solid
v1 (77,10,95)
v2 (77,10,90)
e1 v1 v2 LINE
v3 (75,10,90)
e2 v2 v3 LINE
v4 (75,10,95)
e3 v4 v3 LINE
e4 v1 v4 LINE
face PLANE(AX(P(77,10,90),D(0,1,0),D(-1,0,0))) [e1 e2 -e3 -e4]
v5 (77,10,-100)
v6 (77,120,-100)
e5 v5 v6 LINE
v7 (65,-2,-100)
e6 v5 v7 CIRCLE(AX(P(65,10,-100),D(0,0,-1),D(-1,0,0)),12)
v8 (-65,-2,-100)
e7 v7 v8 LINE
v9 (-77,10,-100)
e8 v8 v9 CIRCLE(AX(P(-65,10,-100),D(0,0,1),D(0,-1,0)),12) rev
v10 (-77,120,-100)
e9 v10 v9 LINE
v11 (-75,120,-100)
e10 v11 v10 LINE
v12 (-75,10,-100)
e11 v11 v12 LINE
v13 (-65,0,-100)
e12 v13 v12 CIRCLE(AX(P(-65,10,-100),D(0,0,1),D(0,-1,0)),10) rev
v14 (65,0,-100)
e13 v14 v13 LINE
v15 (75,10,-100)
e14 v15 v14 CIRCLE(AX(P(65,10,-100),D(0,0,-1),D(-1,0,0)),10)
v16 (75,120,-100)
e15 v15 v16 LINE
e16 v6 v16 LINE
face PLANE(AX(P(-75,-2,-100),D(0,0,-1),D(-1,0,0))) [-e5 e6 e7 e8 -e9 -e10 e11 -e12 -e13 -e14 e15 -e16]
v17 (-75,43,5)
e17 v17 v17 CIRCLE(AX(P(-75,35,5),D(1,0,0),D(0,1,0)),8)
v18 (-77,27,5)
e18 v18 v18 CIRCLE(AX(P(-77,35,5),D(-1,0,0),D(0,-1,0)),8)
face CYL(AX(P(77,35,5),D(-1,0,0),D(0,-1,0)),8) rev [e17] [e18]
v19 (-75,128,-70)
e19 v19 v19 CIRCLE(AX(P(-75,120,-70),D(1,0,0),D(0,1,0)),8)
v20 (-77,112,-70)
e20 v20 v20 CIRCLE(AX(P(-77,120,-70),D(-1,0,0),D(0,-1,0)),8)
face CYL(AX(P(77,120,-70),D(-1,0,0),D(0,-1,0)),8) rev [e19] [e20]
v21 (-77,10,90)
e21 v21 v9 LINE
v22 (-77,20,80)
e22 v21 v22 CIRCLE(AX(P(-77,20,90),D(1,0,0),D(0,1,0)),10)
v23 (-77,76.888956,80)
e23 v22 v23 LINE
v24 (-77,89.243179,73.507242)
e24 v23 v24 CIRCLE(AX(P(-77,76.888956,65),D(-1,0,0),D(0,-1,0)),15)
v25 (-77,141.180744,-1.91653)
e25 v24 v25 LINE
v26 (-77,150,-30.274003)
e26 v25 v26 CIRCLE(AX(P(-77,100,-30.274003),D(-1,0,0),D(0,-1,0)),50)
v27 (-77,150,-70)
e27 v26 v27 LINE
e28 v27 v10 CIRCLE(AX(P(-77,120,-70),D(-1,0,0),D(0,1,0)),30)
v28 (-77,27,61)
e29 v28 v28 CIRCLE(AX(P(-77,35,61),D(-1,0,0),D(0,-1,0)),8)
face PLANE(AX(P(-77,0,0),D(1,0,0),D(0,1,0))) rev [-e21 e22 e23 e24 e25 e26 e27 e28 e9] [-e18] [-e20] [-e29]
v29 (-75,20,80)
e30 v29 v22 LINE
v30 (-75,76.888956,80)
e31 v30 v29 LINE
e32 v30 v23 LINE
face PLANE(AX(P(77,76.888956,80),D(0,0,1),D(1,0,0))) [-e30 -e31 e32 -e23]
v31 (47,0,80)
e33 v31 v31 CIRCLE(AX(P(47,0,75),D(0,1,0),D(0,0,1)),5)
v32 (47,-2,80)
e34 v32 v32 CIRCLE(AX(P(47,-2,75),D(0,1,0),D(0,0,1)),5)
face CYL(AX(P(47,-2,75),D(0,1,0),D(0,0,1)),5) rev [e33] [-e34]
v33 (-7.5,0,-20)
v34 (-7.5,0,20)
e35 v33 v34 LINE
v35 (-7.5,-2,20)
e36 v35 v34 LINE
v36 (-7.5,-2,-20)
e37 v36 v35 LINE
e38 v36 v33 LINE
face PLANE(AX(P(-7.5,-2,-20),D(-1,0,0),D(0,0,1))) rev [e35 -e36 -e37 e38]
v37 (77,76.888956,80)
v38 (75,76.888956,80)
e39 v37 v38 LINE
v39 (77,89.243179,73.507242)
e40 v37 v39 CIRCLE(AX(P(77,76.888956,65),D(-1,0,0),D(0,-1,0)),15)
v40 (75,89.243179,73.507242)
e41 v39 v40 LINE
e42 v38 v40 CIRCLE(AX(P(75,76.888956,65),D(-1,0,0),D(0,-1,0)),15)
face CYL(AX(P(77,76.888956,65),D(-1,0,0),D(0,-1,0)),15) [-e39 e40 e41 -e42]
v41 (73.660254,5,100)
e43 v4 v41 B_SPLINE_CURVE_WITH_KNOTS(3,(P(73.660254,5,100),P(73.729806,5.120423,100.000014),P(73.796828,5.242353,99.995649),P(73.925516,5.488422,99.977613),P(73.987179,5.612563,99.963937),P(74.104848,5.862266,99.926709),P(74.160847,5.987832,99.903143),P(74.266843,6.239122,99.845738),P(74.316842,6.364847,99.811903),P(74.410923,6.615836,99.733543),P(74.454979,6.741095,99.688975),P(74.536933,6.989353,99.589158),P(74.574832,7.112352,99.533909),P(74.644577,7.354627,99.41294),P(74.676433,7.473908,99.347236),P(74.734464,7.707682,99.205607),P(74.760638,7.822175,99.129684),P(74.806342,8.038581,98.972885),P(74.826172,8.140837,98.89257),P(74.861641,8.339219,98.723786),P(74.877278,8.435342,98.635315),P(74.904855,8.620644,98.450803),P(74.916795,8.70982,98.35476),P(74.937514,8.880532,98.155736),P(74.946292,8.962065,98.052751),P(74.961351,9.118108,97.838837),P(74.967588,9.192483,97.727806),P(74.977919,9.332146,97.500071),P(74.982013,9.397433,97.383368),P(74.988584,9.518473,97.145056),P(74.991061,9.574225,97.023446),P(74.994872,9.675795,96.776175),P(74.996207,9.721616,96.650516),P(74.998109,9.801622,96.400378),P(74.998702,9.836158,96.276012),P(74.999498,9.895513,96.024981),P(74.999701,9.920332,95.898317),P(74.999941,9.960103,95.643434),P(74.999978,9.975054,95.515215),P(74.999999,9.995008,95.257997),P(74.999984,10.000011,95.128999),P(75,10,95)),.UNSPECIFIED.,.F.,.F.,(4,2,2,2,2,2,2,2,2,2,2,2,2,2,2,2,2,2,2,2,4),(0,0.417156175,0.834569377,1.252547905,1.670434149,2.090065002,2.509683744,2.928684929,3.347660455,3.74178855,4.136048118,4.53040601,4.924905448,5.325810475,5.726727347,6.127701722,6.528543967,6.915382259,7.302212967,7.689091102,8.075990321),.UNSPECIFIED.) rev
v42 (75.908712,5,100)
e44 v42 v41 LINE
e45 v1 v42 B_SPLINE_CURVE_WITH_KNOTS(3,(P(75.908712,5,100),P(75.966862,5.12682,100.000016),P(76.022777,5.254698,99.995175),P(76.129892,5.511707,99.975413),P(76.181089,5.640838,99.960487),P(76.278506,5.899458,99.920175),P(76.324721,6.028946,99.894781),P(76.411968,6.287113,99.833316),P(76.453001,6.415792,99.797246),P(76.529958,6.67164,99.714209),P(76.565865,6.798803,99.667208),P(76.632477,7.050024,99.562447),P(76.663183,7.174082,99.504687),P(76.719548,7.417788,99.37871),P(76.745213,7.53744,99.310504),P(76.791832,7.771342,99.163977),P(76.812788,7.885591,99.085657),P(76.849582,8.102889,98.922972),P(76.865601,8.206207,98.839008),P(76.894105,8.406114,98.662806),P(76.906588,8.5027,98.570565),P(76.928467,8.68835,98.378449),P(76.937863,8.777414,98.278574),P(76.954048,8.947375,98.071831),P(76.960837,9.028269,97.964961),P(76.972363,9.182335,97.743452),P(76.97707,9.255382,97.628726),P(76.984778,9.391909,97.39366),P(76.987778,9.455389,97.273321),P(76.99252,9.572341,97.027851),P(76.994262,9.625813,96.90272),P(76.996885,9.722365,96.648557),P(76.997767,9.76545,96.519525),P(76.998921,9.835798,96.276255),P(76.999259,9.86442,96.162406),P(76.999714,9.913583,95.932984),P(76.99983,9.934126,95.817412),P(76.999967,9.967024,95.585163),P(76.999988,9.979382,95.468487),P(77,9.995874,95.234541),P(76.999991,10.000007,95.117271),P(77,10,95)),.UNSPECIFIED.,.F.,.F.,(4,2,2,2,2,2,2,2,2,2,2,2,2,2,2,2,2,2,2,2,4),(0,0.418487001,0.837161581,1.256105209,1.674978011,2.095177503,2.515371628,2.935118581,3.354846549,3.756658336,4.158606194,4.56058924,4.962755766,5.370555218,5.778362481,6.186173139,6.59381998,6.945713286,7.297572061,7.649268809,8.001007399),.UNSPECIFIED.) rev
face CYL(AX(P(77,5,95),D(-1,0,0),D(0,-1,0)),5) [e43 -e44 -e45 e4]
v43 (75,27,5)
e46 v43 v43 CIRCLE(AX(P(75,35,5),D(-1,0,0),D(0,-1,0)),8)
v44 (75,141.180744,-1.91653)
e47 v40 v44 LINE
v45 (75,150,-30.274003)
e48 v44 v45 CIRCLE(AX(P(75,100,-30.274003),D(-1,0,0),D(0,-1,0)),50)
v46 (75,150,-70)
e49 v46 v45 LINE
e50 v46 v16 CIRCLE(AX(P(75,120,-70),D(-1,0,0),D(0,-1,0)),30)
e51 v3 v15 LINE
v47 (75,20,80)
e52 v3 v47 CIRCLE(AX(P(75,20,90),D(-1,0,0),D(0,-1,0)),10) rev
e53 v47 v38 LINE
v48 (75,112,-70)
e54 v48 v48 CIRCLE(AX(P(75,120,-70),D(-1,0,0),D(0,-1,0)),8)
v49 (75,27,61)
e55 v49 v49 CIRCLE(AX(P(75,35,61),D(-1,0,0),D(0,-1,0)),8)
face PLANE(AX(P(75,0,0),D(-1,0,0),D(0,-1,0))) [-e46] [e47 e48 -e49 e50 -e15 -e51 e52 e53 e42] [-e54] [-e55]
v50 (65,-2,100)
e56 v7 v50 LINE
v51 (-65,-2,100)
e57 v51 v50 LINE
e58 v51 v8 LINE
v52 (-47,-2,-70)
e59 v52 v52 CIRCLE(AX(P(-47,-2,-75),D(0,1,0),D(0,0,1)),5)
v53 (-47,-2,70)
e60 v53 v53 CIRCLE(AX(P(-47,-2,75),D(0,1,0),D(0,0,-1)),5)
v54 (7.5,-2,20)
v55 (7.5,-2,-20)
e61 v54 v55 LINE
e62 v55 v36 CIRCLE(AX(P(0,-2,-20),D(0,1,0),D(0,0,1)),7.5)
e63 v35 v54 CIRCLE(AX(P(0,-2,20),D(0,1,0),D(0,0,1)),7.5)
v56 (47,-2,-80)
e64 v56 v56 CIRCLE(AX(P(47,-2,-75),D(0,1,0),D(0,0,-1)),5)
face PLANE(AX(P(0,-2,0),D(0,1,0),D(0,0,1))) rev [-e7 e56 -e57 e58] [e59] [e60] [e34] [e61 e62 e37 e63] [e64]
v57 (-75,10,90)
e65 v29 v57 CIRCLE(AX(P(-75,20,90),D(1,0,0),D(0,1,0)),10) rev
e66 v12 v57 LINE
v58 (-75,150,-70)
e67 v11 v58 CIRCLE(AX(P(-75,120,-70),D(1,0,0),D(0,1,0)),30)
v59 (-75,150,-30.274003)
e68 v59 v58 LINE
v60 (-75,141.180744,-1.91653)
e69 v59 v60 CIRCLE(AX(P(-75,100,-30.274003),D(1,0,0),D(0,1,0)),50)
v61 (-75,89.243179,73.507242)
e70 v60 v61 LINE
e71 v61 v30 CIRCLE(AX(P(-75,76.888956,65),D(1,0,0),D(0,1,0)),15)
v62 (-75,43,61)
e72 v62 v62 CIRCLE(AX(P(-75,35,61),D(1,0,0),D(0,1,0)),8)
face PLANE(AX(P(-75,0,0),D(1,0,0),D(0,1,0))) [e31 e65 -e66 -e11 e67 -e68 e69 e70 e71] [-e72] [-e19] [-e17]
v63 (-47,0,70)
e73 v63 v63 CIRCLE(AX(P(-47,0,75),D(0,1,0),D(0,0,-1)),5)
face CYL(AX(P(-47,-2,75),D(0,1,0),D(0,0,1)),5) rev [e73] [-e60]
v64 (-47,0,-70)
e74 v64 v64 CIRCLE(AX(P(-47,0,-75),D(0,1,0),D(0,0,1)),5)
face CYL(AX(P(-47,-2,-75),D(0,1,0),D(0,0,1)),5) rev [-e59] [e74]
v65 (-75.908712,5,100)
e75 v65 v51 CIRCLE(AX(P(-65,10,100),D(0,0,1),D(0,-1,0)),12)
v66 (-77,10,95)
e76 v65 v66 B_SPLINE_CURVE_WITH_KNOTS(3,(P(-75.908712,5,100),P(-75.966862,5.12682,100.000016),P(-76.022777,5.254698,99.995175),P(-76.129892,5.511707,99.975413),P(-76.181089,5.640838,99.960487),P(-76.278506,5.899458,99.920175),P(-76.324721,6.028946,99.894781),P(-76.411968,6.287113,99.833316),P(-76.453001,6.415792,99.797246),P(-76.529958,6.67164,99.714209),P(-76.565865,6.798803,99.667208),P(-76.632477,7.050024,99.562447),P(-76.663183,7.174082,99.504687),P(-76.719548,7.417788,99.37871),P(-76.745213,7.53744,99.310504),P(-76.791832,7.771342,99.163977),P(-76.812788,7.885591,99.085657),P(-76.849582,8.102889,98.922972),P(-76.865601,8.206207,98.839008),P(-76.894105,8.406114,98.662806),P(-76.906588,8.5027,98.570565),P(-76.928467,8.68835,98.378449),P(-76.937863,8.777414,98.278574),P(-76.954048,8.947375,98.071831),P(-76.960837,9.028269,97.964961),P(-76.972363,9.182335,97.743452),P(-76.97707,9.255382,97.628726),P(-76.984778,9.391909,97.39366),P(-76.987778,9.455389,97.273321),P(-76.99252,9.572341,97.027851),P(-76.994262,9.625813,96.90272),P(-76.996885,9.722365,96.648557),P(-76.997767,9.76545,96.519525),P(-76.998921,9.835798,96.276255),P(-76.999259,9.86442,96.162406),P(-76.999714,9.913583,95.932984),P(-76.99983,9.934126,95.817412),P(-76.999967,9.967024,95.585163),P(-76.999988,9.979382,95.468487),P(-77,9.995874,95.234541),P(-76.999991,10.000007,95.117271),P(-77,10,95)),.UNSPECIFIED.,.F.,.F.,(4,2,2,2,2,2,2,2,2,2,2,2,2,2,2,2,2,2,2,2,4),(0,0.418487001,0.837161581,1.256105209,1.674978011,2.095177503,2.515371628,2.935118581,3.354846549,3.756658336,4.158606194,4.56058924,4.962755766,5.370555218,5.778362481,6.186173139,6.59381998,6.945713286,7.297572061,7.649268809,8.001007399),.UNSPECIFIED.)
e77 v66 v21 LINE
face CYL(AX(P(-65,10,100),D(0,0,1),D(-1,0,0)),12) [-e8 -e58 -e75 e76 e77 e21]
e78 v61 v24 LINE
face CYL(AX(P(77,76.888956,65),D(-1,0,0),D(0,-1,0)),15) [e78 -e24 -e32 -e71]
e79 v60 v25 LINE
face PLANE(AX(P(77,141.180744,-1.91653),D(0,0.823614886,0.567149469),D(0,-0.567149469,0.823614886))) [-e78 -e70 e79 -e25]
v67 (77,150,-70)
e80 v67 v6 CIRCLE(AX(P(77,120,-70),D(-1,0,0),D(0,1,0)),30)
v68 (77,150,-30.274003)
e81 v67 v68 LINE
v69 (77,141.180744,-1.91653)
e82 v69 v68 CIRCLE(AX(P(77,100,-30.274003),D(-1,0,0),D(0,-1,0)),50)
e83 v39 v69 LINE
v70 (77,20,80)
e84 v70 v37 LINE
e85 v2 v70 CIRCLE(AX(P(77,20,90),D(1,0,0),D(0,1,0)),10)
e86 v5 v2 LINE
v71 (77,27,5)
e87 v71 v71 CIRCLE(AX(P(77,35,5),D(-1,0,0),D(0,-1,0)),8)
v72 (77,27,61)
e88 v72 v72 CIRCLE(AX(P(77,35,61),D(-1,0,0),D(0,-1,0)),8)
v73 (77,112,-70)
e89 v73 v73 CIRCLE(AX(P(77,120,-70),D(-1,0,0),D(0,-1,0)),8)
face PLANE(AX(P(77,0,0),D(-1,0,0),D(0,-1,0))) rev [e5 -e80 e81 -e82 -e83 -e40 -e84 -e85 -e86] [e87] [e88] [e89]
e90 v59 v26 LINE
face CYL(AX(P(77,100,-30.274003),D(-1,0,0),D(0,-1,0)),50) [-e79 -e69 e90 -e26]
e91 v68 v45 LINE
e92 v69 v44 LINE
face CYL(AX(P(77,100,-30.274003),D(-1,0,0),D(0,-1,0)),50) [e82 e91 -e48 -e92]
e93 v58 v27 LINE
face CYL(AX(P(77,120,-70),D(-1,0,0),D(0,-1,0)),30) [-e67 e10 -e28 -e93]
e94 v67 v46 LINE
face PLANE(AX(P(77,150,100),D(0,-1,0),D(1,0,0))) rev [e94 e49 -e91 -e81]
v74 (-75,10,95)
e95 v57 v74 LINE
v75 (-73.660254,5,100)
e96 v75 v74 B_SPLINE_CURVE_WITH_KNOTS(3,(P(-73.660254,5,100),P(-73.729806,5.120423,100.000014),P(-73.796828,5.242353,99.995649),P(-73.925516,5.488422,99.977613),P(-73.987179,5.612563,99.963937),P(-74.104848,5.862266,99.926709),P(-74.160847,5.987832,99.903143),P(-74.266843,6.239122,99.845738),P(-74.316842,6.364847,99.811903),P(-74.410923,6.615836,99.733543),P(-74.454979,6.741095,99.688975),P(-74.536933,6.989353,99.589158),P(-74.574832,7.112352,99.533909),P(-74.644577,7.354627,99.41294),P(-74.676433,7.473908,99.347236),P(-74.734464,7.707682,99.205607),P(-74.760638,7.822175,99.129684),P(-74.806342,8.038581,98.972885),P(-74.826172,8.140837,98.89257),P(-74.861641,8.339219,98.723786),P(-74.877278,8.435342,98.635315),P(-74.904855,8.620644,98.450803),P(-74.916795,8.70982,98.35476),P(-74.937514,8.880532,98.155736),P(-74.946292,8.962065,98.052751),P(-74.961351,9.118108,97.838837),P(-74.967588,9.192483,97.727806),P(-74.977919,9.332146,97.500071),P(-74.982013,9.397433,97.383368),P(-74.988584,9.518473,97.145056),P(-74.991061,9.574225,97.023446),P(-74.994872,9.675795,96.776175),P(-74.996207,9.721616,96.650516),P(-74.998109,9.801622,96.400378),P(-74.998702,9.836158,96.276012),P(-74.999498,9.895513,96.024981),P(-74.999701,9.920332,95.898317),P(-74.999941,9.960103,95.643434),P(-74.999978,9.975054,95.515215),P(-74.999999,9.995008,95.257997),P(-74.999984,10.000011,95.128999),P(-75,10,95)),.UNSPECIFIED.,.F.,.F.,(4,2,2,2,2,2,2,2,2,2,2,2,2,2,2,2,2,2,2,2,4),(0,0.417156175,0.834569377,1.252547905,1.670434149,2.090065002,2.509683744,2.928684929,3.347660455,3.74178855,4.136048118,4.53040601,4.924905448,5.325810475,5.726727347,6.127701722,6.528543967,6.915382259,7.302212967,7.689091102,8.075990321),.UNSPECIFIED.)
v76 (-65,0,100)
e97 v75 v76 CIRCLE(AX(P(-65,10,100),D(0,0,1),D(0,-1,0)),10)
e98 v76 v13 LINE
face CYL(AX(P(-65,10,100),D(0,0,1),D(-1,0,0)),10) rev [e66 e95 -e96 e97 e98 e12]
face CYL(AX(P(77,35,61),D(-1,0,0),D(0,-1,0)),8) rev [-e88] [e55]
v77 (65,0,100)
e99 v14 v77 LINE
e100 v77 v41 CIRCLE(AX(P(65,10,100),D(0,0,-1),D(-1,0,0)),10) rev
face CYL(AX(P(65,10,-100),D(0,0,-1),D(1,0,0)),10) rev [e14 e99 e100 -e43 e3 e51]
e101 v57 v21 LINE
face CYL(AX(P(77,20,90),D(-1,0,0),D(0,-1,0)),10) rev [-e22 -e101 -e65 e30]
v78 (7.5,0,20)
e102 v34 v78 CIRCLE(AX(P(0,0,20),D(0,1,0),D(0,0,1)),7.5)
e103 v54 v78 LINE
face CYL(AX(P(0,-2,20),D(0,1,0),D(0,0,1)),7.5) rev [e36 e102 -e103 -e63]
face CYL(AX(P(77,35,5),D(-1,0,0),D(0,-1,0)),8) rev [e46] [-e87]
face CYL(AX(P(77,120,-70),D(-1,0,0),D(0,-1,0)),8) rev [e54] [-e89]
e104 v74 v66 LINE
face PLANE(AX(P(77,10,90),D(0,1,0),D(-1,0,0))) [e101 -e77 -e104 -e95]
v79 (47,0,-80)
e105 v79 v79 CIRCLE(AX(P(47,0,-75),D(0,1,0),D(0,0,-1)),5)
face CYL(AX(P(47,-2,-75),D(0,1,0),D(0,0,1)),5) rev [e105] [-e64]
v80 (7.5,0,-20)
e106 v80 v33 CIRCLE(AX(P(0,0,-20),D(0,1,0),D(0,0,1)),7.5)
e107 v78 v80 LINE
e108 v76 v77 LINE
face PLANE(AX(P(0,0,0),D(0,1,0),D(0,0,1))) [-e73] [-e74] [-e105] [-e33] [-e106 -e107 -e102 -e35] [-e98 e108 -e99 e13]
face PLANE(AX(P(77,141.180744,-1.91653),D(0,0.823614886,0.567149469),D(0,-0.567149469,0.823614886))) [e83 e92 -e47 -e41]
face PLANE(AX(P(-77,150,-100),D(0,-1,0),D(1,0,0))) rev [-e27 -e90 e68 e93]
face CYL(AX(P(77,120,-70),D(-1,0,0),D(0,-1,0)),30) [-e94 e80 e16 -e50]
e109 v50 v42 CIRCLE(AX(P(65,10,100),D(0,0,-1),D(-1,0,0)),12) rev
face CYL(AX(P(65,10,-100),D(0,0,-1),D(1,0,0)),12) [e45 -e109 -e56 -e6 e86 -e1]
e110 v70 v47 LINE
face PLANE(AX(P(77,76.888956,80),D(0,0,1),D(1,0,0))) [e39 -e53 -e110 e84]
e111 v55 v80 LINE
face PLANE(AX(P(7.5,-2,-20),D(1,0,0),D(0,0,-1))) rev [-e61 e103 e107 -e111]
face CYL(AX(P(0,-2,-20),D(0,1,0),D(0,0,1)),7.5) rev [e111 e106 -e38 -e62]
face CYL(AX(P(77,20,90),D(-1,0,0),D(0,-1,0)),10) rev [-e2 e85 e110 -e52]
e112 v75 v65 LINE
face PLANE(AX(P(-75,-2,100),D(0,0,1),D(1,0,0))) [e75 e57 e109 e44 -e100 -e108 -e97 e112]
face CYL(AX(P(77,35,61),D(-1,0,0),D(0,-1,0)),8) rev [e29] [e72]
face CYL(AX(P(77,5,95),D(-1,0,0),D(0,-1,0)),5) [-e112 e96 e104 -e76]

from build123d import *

# Parameters (mm, degrees)
SKETCH1_W                      = 150
SKETCH1_H                      = 200
BASE_FLANGE1_DEPTH             = 2
EDGE_FLANGE1_STRIP_W           = 28
EDGE_FLANGE1_STRIP_H           = 2
EDGE_FLANGE1_STRIP_CUT_DEPTH   = 200
EDGE_FLANGE1_STRIP_2_W         = 28
EDGE_FLANGE1_STRIP_2_H         = 2
EDGE_FLANGE1_STRIP_CUT_2_DEPTH = 200
EDGE_FLANGE1_DEPTH             = 200
EDGE_FLANGE1_BEND_DEPTH        = 200
SKETCH15_OUTSIDE_W             = 260.93
SKETCH15_OUTSIDE_H             = 212.93
SKETCH15_OUTSIDE_R             = 8
CUT_EXTRUDE1_DEPTH             = 238.099135384
SKETCH16_R                     = 5
CUT_EXTRUDE2_DEPTH             = 197.033160551


# Sheet-metal steps are written as plain solids
with BuildPart() as part:
    # Sketch1 → Base-Flange1 (new body)
    with BuildSketch(Plane(origin=(0, 0, 0), x_dir=(1, 0, 0), z_dir=(0, 1, 0))):
        Rectangle(SKETCH1_W, SKETCH1_H)
    extrude(amount=-BASE_FLANGE1_DEPTH)

    # Edge-Flange1 strip (across the edge) → Edge-Flange1 strip cut (cut)
    with BuildSketch(Plane(origin=(75, 0, 100), x_dir=(-1, 0, 0), z_dir=(0, 0, -1))):
        with Locations((-4, -1)):
            Rectangle(EDGE_FLANGE1_STRIP_W, EDGE_FLANGE1_STRIP_H)
    extrude(amount=EDGE_FLANGE1_STRIP_CUT_DEPTH, mode=Mode.SUBTRACT)

    # Edge-Flange1 strip 2 (across the edge) → Edge-Flange1 strip cut 2 (cut)
    with BuildSketch(Plane(origin=(-75, 0, -100), x_dir=(1, 0, 0), z_dir=(0, 0, 1))):
        with Locations((-4, -1)):
            Rectangle(EDGE_FLANGE1_STRIP_2_W, EDGE_FLANGE1_STRIP_2_H)
    extrude(amount=EDGE_FLANGE1_STRIP_CUT_2_DEPTH, mode=Mode.SUBTRACT)

    # Edge-Flange1 section (across the edge) → Edge-Flange1 (add)
    with BuildSketch(Plane(origin=(75, 0, 100), x_dir=(-1, 0, 0), z_dir=(0, 0, -1))):
        with BuildLine():
            Line((-2, 10), (-2, 150))
            Line((-2, 150), (0, 150))
            Line((0, 150), (0, 10))
            ThreePointArc((0, 10), (2.928932188, 2.928932188), (10, 0))
            Line((10, 0), (10, -2))
            ThreePointArc((10, -2), (1.514718626, 1.514718626), (-2, 10))
        make_face()
    extrude(amount=EDGE_FLANGE1_DEPTH)

    # Edge-Flange1 section 2 (across the edge) → Edge-Flange1 bend (add)
    with BuildSketch(Plane(origin=(-75, 0, -100), x_dir=(1, 0, 0), z_dir=(0, 0, 1))):
        with BuildLine():
            Line((-2, 10), (-2, 150))
            Line((-2, 150), (0, 150))
            Line((0, 150), (0, 10))
            ThreePointArc((0, 10), (2.928932188, 2.928932188), (10, 0))
            Line((10, 0), (10, -2))
            ThreePointArc((10, -2), (1.514718626, 1.514718626), (-2, 10))
        make_face()
    extrude(amount=EDGE_FLANGE1_BEND_DEPTH)

    # Sketch15 outside → Cut-Extrude1 (cut, through all)
    # profile 1 of 4: a face of its own
    with BuildSketch(Plane.ZY.offset(77)):
        with Locations((0, 74)):
            Rectangle(SKETCH15_OUTSIDE_W, SKETCH15_OUTSIDE_H)
        with BuildLine():
            Line((-1.916529607, 141.180744276), (73.507242037, 89.243178795))
            ThreePointArc((73.507242037, 89.243178795), (78.277963521, 83.867184852), (80, 76.888955512))
            Line((80, 76.888955512), (80, 20))
            ThreePointArc((80, 20), (82.928932188, 12.928932188), (90, 10))
            Line((90, 10), (95, 10))
            ThreePointArc((95, 10), (98.535533906, 8.535533906), (100, 5))
            Line((100, 5), (100, -2))
            Line((100, -2), (-100, -2))
            Line((-100, -2), (-100, 99))
            Line((-100, 99), (-100, 120))
            ThreePointArc((-100, 120), (-91.213203436, 141.213203436), (-70, 150))
            Line((-70, 150), (-49, 150))
            Line((-49, 150), (-30.274003064, 150))
            ThreePointArc((-30.274003064, 150), (-15.425387199, 147.744304445), (-1.916529607, 141.180744276))
        make_face(mode=Mode.SUBTRACT)
    # profile 2 of 4: a face of its own
    with BuildSketch(Plane.ZY.offset(77)):
        with Locations(Location((61, 35, 0), (0, 0, 270))):
            Circle(SKETCH15_OUTSIDE_R)
    # profile 3 of 4: a face of its own
    with BuildSketch(Plane.ZY.offset(77)):
        with Locations(Location((-70, 120, 0), (0, 0, 270))):
            Circle(SKETCH15_OUTSIDE_R)
    # profile 4 of 4: a face of its own
    with BuildSketch(Plane.ZY.offset(77)):
        with Locations(Location((5, 35, 0), (0, 0, 270))):
            Circle(SKETCH15_OUTSIDE_R)
    extrude(amount=-CUT_EXTRUDE1_DEPTH, mode=Mode.SUBTRACT)

    # Sketch16 → Cut-Extrude2 (cut, through all)
    with BuildSketch(Plane(origin=(0, 0, 0), x_dir=(1, 0, 0), z_dir=(0, 1, 0))):
        with Locations(Location((-47, 75, 0), (0, 0, 270))):
            Circle(SKETCH16_R)
        with Locations(Location((47, 75, 0), (0, 0, 90))):
            Circle(SKETCH16_R)
        with Locations(Location((47, -75, 0), (0, 0, 270))):
            Circle(SKETCH16_R)
        with Locations(Location((-47, -75, 0), (0, 0, 90))):
            Circle(SKETCH16_R)
        with BuildLine():
            Line((7.5, 20), (7.5, -20))
            ThreePointArc((7.5, -20), (0, -27.5), (-7.5, -20))
            Line((-7.5, -20), (-7.5, 20))
            ThreePointArc((-7.5, 20), (0, 27.5), (7.5, 20))
        make_face()
    extrude(amount=-CUT_EXTRUDE2_DEPTH, mode=Mode.SUBTRACT)


solid = part.part
